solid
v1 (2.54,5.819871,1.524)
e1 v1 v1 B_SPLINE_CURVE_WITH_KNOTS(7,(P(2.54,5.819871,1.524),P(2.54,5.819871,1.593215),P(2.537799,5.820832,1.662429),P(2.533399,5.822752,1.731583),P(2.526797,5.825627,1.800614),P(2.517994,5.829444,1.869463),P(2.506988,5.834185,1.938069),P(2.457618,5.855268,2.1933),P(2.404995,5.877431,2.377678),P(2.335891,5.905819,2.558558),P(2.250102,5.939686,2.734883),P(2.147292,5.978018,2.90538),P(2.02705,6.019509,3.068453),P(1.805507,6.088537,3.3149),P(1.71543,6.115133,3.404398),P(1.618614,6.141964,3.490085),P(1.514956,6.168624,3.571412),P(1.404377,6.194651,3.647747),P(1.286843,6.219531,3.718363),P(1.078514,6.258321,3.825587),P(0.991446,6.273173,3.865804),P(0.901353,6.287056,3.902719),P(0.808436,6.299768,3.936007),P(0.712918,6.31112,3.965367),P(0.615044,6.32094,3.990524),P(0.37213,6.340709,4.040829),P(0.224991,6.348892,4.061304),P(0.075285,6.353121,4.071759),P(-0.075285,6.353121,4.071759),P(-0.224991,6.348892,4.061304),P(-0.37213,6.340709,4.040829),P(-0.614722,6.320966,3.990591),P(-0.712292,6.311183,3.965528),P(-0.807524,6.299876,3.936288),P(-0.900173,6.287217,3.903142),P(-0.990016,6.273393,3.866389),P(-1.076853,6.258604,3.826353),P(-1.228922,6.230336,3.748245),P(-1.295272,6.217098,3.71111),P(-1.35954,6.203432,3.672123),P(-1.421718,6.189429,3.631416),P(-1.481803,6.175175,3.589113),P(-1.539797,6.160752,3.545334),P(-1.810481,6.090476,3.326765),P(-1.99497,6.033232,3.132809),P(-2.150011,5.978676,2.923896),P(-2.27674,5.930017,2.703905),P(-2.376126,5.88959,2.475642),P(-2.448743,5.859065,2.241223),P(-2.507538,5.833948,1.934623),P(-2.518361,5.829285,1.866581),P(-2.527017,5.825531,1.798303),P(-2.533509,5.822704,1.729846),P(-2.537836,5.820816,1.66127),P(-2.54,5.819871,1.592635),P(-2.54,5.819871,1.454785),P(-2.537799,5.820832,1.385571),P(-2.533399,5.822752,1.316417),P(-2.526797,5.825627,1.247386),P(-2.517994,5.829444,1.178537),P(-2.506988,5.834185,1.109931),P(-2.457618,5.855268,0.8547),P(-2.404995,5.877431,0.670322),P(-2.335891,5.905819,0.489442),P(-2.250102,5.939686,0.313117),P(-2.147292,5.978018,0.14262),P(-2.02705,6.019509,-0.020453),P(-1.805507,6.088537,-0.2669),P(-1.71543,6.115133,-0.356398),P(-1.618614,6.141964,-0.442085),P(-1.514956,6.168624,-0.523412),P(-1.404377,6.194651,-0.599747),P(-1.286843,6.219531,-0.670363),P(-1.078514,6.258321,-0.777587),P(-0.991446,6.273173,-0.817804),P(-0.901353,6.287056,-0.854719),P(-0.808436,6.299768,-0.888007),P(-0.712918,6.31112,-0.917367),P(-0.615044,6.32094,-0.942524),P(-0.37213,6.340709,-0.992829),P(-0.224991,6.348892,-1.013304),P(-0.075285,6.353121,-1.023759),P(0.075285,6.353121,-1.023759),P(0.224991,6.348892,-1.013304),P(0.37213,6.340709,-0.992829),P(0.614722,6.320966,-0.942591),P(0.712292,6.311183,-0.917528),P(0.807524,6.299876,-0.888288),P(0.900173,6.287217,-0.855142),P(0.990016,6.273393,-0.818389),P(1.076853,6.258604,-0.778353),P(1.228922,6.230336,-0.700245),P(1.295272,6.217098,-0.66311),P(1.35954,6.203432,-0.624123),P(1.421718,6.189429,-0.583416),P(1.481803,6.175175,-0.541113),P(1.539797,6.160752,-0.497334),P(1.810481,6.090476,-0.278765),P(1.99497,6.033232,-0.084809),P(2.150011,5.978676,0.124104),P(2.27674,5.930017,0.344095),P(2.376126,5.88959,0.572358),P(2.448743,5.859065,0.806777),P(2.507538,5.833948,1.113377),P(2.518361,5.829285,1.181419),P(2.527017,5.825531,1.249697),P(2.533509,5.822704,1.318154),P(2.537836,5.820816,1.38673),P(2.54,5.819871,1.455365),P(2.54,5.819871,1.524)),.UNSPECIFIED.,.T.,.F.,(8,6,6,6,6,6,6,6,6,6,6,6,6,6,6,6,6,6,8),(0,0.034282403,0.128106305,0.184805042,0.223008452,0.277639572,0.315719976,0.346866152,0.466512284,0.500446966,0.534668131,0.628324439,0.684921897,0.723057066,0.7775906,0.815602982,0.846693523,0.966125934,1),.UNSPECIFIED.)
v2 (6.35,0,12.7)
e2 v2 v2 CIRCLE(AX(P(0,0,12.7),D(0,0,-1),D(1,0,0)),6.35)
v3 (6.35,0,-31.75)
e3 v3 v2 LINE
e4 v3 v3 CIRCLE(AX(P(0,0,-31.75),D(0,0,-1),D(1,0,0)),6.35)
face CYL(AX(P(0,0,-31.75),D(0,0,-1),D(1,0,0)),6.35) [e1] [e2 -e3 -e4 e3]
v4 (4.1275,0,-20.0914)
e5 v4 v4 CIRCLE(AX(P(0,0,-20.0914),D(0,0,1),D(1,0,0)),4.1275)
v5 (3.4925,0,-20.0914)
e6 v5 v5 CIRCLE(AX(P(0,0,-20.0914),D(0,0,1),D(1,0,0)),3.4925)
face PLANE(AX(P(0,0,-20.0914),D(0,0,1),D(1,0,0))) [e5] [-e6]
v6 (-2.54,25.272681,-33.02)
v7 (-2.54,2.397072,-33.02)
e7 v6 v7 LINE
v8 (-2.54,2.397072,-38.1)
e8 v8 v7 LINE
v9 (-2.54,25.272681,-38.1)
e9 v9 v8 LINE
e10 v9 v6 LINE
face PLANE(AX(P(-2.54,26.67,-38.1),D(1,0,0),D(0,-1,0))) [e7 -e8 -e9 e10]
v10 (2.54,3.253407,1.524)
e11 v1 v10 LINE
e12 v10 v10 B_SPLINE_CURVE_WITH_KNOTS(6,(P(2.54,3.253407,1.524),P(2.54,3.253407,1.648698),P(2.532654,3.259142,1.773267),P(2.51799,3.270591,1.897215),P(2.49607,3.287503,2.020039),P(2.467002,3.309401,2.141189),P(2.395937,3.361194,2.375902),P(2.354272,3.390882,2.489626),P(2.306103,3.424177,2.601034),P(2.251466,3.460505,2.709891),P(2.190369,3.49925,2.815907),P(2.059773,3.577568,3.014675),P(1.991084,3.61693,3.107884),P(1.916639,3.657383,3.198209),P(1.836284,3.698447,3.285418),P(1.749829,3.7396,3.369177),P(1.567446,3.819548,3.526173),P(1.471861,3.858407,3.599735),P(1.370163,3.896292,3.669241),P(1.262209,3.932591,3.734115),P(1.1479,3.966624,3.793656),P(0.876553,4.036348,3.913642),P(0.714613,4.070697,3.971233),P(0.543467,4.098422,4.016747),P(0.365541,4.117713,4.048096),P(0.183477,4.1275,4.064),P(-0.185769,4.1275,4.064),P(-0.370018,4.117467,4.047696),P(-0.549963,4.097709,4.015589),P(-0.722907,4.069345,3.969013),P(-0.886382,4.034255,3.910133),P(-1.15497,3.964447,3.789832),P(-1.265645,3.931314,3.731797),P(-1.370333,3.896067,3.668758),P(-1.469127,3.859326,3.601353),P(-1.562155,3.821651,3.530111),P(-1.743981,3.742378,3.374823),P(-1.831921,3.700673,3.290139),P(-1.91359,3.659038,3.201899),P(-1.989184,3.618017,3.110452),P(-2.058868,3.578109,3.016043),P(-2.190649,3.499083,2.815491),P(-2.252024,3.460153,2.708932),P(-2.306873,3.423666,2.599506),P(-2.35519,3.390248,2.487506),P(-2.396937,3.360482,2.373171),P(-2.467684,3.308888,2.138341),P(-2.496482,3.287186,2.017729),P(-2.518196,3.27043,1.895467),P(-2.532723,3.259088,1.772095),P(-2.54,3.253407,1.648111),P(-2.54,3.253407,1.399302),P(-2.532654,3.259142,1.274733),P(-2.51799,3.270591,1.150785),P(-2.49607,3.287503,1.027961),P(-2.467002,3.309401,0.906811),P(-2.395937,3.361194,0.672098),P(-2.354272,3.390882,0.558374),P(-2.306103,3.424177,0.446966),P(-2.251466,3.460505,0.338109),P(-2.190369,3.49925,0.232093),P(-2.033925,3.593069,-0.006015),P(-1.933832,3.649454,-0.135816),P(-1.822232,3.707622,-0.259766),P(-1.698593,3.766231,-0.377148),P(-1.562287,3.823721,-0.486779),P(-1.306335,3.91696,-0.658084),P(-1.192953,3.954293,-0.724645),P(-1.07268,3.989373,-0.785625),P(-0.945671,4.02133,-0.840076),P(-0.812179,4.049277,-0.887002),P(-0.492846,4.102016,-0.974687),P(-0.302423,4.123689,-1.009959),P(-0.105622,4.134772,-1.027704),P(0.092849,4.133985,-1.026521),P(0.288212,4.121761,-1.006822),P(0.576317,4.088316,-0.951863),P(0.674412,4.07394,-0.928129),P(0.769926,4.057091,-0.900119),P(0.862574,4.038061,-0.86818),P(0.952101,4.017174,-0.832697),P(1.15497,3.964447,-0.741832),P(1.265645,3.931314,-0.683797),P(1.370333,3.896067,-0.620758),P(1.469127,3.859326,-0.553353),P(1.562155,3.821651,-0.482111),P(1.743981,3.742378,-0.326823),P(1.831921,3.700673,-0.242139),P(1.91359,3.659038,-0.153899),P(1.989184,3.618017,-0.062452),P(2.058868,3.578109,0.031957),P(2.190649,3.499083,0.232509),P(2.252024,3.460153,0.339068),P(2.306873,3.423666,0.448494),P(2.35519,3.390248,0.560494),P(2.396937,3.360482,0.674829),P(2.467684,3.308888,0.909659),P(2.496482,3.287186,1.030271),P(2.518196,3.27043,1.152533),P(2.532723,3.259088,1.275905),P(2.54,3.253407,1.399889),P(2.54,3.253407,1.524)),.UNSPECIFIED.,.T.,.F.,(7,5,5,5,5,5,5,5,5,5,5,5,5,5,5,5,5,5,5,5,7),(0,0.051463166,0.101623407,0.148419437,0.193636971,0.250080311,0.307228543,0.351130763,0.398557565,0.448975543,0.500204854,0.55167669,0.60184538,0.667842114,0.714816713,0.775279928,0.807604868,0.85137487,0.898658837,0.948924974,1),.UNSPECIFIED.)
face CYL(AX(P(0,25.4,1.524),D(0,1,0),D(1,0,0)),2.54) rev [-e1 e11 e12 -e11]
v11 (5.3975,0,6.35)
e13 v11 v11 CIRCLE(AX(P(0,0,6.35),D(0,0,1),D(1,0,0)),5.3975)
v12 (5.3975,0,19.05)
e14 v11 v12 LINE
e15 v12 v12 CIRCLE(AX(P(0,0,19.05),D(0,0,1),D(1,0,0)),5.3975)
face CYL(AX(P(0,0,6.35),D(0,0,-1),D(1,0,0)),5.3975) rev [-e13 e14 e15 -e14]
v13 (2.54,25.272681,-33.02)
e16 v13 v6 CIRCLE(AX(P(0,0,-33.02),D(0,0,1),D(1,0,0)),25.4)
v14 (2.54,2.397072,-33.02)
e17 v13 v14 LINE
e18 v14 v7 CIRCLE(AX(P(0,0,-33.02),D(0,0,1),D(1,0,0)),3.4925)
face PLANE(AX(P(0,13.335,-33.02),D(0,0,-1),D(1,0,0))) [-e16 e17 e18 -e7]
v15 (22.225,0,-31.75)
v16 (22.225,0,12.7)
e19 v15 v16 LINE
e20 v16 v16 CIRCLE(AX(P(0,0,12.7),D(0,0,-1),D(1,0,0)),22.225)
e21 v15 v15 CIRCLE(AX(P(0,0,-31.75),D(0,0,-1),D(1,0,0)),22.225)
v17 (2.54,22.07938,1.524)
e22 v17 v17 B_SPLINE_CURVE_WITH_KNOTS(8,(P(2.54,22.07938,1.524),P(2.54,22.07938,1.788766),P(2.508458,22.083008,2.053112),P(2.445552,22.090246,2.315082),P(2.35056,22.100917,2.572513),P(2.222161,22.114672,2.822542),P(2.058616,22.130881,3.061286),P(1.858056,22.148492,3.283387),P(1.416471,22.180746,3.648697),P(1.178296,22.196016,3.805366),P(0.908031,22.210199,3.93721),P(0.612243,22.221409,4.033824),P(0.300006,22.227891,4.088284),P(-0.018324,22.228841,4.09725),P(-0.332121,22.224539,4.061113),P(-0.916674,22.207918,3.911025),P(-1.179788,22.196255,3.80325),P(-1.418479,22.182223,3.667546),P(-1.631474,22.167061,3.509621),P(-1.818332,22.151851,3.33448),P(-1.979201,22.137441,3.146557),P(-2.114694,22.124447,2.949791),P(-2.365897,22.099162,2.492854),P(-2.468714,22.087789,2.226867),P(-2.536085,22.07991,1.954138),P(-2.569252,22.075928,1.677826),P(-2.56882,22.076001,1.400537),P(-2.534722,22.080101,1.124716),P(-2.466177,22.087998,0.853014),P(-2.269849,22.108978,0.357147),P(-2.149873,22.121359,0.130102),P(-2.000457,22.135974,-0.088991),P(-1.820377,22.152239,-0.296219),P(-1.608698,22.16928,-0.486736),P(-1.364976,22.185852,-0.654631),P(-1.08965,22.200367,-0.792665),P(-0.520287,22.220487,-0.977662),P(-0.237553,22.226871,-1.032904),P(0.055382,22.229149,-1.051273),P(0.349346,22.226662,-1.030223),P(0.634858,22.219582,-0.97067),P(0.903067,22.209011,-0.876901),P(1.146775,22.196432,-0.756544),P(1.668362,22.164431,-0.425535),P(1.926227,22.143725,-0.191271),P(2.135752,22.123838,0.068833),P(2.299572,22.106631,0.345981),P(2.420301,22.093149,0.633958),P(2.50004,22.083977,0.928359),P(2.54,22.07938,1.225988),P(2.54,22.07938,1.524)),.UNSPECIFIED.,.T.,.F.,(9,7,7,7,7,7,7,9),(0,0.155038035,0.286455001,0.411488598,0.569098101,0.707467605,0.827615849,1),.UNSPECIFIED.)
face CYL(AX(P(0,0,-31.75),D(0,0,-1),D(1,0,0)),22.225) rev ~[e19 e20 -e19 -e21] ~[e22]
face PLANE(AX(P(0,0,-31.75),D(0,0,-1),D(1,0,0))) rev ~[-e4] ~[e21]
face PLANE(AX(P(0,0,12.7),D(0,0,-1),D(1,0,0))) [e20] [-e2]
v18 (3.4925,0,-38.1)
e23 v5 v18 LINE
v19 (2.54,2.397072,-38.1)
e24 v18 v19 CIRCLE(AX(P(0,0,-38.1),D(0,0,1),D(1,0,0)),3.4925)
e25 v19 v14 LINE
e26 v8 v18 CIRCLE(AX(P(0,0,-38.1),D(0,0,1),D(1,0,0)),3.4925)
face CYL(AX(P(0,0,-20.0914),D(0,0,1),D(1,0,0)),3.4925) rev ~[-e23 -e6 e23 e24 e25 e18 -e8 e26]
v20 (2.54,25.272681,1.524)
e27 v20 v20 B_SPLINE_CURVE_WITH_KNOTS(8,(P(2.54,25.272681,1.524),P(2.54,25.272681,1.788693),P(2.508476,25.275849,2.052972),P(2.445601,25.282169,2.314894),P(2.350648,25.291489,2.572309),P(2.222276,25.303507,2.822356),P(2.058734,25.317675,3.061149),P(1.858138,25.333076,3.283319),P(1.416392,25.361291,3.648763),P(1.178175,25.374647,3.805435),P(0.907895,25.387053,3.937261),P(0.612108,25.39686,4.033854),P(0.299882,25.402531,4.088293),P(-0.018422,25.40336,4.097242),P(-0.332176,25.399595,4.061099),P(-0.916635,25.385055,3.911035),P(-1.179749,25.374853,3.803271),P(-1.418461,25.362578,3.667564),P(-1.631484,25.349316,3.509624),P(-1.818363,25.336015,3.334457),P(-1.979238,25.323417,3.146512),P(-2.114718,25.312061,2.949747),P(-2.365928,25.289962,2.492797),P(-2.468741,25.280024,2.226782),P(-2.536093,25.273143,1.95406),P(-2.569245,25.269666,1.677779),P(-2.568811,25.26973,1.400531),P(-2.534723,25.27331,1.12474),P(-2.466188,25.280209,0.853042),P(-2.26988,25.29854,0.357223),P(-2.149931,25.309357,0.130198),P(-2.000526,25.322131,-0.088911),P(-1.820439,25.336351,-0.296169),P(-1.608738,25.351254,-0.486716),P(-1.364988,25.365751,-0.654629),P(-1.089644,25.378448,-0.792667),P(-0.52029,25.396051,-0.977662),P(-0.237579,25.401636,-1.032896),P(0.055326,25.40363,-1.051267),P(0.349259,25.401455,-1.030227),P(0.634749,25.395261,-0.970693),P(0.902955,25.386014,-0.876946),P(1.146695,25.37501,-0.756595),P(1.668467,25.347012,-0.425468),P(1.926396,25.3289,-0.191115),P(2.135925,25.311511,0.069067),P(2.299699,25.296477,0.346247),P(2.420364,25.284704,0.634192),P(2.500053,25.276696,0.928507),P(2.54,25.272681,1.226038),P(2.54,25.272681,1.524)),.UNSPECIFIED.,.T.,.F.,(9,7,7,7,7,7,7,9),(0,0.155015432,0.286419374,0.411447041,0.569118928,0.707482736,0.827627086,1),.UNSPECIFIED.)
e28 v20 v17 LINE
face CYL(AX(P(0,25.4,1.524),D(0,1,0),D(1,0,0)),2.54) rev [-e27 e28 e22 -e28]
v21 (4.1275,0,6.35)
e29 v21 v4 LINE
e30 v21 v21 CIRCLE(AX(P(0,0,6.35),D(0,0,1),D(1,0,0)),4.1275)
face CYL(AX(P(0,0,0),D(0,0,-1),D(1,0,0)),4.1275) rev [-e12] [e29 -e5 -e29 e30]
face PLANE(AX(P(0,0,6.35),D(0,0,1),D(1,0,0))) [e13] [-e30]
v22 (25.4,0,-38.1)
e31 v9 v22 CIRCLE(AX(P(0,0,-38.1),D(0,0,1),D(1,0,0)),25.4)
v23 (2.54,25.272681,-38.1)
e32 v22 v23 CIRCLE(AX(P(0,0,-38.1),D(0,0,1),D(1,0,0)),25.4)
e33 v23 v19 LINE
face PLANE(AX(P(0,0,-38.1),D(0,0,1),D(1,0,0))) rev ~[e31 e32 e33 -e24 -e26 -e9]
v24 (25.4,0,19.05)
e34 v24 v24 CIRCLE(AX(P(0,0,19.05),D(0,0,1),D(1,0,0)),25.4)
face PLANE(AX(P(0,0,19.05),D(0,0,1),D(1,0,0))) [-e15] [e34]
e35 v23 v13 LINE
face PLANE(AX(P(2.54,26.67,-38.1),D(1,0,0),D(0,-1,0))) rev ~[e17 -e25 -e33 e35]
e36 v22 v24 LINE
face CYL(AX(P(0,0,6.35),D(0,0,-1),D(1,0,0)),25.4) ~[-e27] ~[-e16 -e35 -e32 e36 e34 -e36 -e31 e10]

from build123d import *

# Parameters (mm, degrees)
F0_R      = 25.4
F1_DEPTH  = 38.1
F3_R      = 4.1275
F4_DEPTH  = 20.0914
F5_R      = 3.4925
F6_DEPTH  = 18.0096
F7_W      = 5.08
F7_H      = 26.67
F8_DEPTH  = 5.08
F9_R      = 25.4
F9_R_2    = 4.1275
F10_DEPTH = 6.35
F11_R     = 25.4
F11_R_2   = 5.3975
F12_DEPTH = 12.7
F13_R     = 2.54
F14_DEPTH = 25.4
F16_R     = 22.225
F16_R_2   = 6.35
F17_DEPTH = 44.45


with BuildPart() as f1:
    # F0 (on Top) → F1 (new body)
    with BuildSketch(Plane.XY):
        Circle(F0_R)
    extrude(amount=-F1_DEPTH)

    # F3 (on face) → F4 (cut)
    with BuildSketch(Plane.XY):
        Circle(F3_R)
    extrude(amount=-F4_DEPTH, mode=Mode.SUBTRACT)

    # F5 (on face) → F6 (cut, through all)
    with BuildSketch(Plane.XY.offset(-20.0914)):
        Circle(F5_R)
    extrude(amount=-F6_DEPTH, mode=Mode.SUBTRACT)

    # F7 (on face) → F8 (cut)
    with BuildSketch(Plane(origin=(0, 0, -38.1), x_dir=(1, 0, 0), z_dir=(0, 0, -1))):
        with Locations((0, -13.335)):
            Rectangle(F7_W, F7_H)
    extrude(amount=-F8_DEPTH, mode=Mode.SUBTRACT)

    # F9 (on face) → F10 (join)
    with BuildSketch(Plane.XY):
        Circle(F9_R)
        Circle(F9_R_2, mode=Mode.SUBTRACT)
    extrude(amount=F10_DEPTH)

    # F11 (on face) → F12 (join)
    with BuildSketch(Plane.XY.offset(6.35)):
        Circle(F11_R)
        Circle(F11_R_2, mode=Mode.SUBTRACT)
    extrude(amount=F12_DEPTH)

    # F13 (on offset) → F14 (cut, through all)
    with BuildSketch(Plane.XZ.offset(-25.4)):
        with Locations((0, 1.524)):
            Circle(F13_R)
    extrude(amount=F14_DEPTH, mode=Mode.SUBTRACT)

    # F16 (on offset) → F17 (cut)
    with BuildSketch(Plane(origin=(0, 0, -31.75), x_dir=(1, 0, 0), z_dir=(0, 0, -1))):
        Circle(F16_R)
        Circle(F16_R_2, mode=Mode.SUBTRACT)
    extrude(amount=-F17_DEPTH, mode=Mode.SUBTRACT)


solid = f1.part
